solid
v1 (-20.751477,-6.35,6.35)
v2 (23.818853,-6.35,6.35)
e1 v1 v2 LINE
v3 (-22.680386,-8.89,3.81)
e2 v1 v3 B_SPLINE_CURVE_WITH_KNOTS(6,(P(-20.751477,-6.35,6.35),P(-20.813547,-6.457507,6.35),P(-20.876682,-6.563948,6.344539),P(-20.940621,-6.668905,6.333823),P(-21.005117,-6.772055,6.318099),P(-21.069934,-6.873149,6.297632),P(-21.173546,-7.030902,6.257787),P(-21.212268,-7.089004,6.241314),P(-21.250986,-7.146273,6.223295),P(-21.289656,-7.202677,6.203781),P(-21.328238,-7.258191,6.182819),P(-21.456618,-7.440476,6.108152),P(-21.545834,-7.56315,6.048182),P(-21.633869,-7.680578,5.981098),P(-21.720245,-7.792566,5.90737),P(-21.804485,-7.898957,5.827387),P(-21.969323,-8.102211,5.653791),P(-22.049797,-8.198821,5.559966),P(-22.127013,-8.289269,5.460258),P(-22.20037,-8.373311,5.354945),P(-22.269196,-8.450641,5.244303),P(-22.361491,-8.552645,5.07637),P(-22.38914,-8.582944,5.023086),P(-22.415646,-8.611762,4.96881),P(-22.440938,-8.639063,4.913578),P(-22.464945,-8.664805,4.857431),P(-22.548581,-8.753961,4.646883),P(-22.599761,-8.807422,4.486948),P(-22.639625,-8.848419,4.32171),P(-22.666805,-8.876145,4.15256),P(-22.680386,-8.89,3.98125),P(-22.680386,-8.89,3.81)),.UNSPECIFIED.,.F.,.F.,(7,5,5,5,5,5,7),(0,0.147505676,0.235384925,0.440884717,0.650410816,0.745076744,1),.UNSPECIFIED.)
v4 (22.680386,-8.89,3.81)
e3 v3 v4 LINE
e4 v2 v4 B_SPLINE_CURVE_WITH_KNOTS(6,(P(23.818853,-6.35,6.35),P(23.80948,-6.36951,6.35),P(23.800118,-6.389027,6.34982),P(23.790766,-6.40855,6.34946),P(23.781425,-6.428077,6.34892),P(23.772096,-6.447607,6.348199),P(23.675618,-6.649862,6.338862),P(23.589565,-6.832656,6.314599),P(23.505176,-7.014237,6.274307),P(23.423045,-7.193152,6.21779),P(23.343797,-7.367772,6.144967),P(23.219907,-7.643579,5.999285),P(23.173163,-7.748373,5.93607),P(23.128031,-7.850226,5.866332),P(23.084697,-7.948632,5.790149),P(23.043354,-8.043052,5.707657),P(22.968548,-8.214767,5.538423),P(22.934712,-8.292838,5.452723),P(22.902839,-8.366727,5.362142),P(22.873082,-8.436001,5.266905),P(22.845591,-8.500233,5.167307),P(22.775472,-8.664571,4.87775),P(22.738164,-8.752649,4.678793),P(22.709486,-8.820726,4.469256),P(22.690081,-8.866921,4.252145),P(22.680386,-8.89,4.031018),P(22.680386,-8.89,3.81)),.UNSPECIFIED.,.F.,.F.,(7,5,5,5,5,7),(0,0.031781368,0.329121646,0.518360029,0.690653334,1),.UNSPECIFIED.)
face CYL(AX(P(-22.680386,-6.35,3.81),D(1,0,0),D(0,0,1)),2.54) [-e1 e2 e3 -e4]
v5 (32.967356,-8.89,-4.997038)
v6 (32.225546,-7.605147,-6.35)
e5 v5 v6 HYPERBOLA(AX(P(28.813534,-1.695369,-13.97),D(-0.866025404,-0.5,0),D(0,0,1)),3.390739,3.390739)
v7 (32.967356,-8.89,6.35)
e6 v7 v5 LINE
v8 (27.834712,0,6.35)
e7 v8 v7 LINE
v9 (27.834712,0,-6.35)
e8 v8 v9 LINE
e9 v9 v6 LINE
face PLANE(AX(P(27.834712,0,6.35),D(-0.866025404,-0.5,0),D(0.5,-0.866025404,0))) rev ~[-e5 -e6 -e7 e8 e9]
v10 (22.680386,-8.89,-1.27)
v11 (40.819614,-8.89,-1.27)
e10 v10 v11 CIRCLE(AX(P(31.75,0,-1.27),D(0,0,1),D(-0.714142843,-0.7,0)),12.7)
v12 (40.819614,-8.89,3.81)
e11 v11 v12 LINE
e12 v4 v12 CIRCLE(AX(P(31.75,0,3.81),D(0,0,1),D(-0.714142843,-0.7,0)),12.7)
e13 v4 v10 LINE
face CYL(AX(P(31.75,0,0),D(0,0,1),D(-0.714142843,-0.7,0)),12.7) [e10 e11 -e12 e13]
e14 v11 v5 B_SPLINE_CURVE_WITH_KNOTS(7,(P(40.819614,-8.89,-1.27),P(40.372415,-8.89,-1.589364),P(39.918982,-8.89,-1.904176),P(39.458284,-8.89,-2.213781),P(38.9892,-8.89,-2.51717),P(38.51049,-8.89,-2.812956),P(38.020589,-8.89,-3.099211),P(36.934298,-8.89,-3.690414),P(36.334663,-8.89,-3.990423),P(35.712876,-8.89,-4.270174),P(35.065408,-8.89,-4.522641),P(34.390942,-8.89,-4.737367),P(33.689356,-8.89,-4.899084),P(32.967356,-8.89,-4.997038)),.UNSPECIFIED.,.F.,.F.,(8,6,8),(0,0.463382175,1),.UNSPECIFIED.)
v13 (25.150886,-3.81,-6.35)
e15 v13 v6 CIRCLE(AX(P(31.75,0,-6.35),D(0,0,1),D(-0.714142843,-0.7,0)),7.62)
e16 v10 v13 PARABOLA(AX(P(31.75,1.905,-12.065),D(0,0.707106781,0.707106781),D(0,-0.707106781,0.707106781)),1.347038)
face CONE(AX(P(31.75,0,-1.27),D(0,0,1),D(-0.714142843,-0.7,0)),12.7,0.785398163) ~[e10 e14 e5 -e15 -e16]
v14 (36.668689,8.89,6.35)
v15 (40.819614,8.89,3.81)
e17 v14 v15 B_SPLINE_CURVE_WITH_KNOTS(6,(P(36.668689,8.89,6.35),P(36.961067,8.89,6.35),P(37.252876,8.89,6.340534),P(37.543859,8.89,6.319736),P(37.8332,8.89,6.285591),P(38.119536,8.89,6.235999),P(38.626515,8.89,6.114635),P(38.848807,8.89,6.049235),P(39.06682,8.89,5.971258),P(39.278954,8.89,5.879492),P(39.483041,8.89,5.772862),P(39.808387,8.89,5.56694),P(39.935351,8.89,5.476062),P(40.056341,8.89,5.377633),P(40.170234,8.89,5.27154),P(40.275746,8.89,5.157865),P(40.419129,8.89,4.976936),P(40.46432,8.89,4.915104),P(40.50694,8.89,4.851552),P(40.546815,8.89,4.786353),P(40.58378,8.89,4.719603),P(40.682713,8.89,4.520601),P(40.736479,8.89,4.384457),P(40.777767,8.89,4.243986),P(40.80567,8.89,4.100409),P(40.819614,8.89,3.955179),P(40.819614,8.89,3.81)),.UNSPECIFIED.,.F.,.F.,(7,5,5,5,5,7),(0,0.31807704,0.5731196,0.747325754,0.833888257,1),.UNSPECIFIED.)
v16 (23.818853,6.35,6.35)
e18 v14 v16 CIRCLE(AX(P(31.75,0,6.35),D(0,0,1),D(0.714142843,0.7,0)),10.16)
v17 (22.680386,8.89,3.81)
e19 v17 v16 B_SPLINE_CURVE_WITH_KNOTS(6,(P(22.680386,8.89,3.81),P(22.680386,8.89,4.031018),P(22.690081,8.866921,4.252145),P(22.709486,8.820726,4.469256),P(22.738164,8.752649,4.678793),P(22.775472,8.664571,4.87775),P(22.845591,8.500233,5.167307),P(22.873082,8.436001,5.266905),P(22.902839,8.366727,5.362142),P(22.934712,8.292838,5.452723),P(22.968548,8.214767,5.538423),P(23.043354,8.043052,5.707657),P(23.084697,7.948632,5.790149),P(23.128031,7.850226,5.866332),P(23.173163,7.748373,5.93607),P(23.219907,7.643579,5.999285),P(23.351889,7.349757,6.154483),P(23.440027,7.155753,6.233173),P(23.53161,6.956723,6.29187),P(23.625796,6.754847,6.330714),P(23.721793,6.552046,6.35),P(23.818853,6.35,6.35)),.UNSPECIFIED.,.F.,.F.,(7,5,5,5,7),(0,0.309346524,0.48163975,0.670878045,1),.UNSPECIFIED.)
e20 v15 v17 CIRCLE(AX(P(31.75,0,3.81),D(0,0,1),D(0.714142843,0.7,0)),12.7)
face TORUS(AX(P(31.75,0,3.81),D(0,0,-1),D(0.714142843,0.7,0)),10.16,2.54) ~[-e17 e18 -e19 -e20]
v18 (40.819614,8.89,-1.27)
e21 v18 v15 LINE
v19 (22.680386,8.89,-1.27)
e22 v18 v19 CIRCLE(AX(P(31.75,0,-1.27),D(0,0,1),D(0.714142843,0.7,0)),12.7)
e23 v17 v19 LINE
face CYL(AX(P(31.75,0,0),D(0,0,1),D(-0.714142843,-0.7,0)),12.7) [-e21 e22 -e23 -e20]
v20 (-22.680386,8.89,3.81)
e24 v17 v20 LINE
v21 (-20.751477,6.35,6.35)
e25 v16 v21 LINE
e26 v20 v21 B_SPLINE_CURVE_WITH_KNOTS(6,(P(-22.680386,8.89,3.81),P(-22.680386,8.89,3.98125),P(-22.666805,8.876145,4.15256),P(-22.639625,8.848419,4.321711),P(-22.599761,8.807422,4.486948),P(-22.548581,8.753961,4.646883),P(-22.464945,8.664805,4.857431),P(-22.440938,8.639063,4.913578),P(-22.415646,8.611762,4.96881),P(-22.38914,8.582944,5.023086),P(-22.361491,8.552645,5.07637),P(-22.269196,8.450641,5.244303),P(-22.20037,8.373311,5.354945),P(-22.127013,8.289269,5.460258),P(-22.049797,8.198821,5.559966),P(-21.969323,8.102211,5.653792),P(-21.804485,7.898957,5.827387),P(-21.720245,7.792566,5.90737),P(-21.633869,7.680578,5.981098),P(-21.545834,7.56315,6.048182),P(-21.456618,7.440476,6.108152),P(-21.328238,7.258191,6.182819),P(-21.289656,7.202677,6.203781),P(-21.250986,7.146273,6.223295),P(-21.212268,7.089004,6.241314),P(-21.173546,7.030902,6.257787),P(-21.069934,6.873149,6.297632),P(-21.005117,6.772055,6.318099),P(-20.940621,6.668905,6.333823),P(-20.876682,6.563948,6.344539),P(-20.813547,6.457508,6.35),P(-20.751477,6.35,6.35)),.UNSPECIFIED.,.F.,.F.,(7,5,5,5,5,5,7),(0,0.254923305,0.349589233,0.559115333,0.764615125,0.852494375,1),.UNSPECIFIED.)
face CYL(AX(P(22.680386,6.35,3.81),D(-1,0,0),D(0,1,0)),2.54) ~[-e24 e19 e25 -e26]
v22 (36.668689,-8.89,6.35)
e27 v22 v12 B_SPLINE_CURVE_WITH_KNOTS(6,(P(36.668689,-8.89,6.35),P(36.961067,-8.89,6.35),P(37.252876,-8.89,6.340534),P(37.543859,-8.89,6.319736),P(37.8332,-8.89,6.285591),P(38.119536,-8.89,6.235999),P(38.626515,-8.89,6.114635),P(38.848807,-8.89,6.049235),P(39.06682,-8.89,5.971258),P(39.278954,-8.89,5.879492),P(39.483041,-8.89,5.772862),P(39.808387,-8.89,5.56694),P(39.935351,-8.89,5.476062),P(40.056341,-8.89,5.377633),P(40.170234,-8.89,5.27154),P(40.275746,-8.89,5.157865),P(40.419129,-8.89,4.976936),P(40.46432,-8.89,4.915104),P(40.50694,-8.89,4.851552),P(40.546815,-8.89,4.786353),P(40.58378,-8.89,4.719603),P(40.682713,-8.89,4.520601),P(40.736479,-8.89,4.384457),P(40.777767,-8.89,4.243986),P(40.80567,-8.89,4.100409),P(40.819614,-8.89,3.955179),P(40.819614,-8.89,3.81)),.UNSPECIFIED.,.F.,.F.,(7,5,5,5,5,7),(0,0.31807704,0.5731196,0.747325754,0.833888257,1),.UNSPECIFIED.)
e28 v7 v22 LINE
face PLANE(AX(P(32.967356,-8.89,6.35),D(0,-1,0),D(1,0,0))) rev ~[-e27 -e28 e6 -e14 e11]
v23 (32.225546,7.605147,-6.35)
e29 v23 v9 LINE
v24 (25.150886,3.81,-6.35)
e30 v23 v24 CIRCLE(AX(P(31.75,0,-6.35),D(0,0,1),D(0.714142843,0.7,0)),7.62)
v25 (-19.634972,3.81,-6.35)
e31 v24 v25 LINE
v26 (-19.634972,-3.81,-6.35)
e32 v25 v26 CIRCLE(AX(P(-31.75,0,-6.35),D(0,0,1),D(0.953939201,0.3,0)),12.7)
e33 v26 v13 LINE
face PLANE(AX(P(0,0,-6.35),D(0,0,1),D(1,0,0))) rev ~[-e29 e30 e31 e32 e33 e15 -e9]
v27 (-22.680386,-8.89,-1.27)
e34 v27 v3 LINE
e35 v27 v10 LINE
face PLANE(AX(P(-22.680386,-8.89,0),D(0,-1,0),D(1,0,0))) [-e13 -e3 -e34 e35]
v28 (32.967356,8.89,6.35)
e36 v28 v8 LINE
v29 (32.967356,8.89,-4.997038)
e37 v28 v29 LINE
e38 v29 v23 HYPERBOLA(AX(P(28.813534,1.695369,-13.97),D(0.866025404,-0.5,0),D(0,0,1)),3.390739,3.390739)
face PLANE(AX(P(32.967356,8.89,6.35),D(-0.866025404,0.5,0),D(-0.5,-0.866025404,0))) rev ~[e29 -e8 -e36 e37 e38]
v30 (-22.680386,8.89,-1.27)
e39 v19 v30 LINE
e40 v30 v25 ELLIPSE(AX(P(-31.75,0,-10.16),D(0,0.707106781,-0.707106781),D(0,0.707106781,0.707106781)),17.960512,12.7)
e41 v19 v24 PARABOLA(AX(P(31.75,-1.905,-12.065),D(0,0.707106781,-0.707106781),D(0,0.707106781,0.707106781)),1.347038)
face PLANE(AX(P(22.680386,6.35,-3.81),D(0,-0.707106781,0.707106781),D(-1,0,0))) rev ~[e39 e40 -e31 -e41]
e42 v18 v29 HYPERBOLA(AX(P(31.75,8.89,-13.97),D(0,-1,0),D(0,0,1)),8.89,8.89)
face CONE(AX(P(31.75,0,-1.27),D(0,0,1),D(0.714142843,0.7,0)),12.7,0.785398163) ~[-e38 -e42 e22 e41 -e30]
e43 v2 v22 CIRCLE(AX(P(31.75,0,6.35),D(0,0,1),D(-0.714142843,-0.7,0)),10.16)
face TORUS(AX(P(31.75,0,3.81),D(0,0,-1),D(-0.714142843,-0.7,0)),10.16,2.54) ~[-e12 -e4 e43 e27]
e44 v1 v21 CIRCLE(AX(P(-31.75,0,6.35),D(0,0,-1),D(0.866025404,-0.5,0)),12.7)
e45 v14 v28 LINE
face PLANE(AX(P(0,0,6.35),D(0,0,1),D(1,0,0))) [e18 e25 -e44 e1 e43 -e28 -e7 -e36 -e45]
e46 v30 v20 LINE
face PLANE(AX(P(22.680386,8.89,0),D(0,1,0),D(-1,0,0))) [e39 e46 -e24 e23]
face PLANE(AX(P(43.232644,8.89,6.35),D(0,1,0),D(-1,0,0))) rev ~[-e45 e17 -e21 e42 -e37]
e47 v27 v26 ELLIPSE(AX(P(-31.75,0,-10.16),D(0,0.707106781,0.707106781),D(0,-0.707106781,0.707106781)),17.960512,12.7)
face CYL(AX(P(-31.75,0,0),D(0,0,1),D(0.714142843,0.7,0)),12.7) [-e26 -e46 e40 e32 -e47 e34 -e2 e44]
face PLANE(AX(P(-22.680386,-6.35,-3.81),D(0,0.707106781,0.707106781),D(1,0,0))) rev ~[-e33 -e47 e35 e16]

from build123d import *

# Parameters (mm, degrees)
F1_DEPTH = 6.35
F3_DEPTH = 12.701
F4_R     = 2.54
F5_SIZE  = 5.08


with BuildPart() as f1:
    # F0 (on Top) → F1 (new body, symmetric)
    with BuildSketch(Plane.XY):
        with BuildLine():
            Line((22.6803858958, 8.89), (-22.6803858958, 8.89))
            ThreePointArc((-22.6803858958, 8.89), (-44.45, 0), (-22.6803858958, -8.89))
            Line((-22.6803858958, -8.89), (22.6803858958, -8.89))
            ThreePointArc((22.6803858958, -8.89), (44.45, 0), (22.6803858958, 8.89))
        make_face()
    extrude(amount=F1_DEPTH, both=True)

    # F2 (on face) → F3 (cut, through all)
    with BuildSketch(Plane.XY.offset(6.35)):
        Polygon((27.8347122138, 0), (32.9673561069, -8.89), (43.2326438931, -8.89), (48.3652877862, 0), (43.2326438931, 8.89), (32.9673561069, 8.89), align=None)
    extrude(amount=-F3_DEPTH, mode=Mode.SUBTRACT)

    # F4
    f4_edges = [f1.edges().sort_by_distance(p)[0] for p in [
        (0, -8.89, 6.35),
        (31.75, -12.7, 6.35),
        (0, 8.89, 6.35),
        (31.75, 12.7, 6.35),
    ]]
    fillet(f4_edges, radius=F4_R)

    # F5
    f5_edges = [f1.edges().sort_by_distance(p)[0] for p in [
        (0, 8.89, -6.35),
        (31.75, 12.7, -6.35),
        (0, -8.89, -6.35),
        (31.75, -12.7, -6.35),
    ]]
    chamfer(f5_edges, length=F5_SIZE)


solid = f1.part
